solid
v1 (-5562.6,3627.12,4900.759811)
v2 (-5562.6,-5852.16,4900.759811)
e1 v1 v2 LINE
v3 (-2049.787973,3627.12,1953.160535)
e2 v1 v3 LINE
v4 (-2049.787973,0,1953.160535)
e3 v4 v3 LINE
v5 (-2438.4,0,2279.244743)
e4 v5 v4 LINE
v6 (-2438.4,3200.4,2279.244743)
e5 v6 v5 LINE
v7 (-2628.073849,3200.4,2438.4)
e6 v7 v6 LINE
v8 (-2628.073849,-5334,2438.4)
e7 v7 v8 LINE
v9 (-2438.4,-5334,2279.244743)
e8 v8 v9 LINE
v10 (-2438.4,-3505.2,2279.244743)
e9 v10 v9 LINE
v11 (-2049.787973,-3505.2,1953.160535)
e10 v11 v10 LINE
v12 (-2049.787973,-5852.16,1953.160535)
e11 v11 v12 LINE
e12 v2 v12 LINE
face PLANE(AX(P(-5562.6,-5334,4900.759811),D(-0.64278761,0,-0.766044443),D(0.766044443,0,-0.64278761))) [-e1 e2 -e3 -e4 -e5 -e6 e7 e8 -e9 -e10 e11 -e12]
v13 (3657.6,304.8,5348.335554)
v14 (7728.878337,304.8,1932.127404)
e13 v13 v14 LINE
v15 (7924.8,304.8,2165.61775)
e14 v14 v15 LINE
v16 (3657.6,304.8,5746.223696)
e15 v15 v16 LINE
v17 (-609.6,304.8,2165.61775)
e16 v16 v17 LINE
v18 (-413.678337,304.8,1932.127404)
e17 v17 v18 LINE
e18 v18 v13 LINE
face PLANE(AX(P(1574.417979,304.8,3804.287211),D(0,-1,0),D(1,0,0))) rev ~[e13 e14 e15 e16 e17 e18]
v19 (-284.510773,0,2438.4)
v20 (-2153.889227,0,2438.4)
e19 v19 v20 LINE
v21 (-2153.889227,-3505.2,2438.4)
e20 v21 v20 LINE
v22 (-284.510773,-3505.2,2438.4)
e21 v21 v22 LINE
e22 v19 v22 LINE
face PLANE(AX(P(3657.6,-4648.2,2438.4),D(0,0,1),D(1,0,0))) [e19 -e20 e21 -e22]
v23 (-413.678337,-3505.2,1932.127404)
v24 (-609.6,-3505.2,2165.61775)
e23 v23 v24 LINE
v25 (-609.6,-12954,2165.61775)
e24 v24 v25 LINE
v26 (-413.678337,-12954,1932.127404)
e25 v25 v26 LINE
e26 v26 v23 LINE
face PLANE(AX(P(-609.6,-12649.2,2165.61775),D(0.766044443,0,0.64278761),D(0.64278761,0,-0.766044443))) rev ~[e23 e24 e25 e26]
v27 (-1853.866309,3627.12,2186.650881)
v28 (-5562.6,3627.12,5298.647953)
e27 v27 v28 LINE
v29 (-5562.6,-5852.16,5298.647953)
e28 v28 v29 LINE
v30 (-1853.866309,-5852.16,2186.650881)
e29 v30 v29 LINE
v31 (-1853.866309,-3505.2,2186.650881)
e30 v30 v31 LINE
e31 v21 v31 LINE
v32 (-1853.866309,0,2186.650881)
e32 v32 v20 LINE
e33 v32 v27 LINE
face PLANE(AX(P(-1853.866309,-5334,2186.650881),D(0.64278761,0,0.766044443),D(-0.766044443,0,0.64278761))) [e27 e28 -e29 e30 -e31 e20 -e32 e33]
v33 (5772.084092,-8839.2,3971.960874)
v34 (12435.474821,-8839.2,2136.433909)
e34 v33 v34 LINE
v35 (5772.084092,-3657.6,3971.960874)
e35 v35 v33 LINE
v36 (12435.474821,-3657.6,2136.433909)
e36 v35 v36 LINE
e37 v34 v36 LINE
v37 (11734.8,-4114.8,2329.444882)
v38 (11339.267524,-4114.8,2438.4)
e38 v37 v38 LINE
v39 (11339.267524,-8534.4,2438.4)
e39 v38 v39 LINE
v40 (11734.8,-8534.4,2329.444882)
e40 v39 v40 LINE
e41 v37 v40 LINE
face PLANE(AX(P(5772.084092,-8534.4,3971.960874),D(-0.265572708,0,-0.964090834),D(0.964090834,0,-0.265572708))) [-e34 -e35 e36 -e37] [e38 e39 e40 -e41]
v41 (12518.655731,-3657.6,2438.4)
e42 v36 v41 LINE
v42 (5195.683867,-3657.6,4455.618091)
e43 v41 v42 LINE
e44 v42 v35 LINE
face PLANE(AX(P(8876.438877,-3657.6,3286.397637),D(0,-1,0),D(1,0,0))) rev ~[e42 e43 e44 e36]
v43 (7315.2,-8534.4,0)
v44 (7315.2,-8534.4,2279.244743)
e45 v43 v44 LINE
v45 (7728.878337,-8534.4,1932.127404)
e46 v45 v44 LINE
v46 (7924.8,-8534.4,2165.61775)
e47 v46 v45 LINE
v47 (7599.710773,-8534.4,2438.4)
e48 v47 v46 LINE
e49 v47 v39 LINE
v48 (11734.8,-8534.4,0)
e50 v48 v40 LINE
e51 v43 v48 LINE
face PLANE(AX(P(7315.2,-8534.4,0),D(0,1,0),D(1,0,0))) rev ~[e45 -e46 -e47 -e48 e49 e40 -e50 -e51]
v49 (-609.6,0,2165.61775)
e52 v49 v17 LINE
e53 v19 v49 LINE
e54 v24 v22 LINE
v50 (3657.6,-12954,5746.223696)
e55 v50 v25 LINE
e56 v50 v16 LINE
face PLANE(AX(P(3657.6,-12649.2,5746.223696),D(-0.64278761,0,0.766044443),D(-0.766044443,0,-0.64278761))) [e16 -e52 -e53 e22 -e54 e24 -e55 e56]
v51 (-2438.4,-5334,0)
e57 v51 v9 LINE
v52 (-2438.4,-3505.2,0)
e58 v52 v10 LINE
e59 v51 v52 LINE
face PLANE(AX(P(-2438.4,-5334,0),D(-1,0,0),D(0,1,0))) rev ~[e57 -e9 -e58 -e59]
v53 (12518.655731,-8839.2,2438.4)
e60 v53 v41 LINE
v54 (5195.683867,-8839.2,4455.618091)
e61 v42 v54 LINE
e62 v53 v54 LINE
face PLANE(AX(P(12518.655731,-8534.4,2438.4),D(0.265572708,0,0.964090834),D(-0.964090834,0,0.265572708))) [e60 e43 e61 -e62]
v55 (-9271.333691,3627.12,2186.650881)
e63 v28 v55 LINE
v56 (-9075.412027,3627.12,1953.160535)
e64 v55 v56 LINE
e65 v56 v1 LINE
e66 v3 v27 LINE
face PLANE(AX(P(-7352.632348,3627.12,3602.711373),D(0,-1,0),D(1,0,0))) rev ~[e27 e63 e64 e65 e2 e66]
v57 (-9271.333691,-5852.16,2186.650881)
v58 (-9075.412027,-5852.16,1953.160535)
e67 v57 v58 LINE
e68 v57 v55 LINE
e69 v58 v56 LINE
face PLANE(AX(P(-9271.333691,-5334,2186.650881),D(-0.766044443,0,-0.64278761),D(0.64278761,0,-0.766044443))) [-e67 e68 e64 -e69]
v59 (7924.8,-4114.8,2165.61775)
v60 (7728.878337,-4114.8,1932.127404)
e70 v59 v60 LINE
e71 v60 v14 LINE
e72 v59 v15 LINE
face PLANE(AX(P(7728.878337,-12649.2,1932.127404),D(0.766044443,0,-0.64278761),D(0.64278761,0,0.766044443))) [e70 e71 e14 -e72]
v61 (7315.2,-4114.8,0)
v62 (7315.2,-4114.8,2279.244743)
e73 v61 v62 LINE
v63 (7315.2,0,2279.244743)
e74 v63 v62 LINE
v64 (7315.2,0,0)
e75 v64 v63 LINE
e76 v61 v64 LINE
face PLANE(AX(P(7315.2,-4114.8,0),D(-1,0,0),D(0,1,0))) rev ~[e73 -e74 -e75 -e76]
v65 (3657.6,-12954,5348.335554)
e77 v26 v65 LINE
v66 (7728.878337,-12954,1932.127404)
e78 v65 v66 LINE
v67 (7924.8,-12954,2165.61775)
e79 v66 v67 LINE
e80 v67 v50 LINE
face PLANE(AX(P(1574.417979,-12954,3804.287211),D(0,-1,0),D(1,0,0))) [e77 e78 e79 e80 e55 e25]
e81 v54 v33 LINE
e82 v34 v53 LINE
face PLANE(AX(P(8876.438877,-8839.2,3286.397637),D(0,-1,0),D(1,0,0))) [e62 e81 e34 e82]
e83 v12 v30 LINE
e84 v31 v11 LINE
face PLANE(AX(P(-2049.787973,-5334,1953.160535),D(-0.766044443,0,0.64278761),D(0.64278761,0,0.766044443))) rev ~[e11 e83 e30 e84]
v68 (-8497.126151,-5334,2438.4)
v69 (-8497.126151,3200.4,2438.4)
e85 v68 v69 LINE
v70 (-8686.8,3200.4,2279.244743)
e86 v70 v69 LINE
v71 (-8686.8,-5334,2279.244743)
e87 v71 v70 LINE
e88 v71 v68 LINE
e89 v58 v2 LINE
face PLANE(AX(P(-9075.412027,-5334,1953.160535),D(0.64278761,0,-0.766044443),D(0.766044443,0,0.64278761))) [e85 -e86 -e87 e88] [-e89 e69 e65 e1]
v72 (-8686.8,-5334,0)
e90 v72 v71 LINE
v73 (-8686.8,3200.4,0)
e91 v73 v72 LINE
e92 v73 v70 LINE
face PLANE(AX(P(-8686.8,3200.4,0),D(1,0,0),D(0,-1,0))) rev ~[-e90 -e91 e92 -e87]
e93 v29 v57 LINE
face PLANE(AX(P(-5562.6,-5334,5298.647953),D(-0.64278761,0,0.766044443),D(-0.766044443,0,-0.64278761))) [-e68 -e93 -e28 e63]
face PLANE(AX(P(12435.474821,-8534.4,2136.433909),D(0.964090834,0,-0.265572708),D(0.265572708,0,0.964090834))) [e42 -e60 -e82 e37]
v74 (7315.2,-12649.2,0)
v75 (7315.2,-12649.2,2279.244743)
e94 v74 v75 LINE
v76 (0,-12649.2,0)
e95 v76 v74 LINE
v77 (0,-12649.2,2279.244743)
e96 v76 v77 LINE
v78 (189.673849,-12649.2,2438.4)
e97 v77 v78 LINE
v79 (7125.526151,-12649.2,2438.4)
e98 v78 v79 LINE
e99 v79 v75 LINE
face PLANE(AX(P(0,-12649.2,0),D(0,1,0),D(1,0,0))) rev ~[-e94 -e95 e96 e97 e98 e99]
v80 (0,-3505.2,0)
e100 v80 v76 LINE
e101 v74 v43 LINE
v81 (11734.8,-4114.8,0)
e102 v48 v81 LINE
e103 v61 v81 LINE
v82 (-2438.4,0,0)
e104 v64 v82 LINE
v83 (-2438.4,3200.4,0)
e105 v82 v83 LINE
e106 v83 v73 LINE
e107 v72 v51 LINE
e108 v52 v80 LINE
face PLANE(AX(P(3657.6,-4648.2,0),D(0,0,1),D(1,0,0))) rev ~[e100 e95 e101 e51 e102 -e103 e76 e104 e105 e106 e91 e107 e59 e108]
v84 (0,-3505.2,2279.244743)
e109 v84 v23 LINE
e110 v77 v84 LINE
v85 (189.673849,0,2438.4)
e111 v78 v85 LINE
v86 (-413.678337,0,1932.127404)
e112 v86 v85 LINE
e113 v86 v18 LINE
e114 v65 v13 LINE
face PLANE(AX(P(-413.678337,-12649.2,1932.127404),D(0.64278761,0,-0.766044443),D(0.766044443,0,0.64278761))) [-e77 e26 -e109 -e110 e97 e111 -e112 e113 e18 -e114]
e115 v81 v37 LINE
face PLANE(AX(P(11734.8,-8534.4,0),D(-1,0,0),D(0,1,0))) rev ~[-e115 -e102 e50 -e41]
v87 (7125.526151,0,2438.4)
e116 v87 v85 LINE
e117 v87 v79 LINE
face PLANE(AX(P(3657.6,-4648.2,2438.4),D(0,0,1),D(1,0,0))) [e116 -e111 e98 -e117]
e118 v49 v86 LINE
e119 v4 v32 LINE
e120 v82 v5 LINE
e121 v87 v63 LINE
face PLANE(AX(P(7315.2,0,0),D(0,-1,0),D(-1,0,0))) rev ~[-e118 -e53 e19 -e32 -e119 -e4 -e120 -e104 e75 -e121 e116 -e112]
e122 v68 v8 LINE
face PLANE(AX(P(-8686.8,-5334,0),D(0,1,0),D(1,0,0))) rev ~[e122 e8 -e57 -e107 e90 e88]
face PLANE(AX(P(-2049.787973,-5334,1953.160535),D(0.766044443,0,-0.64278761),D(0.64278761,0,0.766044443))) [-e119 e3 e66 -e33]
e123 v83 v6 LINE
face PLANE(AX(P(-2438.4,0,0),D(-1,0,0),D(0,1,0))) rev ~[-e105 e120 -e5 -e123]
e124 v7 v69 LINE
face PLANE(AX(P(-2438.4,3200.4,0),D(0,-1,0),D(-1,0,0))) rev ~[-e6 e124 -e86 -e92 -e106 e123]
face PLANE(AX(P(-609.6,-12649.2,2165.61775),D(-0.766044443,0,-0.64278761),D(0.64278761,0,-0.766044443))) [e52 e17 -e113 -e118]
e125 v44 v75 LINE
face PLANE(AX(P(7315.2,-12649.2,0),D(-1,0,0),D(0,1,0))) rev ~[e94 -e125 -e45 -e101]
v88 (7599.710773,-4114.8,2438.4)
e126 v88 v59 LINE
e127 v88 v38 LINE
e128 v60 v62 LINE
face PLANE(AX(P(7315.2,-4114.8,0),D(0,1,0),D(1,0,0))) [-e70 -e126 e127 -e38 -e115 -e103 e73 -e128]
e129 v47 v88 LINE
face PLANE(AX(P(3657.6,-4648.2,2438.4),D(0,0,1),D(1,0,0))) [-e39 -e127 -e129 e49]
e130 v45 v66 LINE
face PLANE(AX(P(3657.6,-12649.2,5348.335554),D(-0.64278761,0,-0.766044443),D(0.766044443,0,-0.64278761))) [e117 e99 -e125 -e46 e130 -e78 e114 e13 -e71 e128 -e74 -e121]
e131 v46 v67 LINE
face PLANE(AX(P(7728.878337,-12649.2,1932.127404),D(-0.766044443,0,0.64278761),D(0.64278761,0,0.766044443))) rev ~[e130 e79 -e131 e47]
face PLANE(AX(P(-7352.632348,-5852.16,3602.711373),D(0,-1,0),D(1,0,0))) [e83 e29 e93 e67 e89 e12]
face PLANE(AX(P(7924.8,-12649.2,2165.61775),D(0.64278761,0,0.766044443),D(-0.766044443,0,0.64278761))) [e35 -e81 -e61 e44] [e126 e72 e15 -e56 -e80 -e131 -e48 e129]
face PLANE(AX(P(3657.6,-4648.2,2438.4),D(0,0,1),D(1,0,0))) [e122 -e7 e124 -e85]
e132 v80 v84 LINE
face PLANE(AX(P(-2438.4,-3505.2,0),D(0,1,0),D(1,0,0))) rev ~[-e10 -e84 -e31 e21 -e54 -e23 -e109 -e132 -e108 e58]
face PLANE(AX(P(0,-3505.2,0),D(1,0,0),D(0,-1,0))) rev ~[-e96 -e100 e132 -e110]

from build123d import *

# Parameters (mm, degrees)
F0_W          = 7315.2
F0_H          = 3352.8
F0_W_2        = 2438.4
F0_H_2        = 3505.2
F0_W_3        = 4419.6
F0_H_3        = 4419.6
F1_DEPTH      = 2438.4
F3_DEPTH      = 304.8
F3_DEPTH_BACK = 12954
F5_DEPTH      = 304.8
F5_DEPTH_BACK = 4876.8
F7_DEPTH      = 518.16
F7_DEPTH_BACK = 8961.12


with BuildPart() as f1:
    # F0 (on Top) → F1 (new body)
    with BuildSketch(Plane.XY):
        Polygon((7315.2, 0), (0, 0), (0, -3505.2), (0, -9296.4), (7315.2, -9296.4), (7315.2, -8534.4), (7315.2, -4114.8), align=None)
        with Locations((3657.6, -10972.8)):
            Rectangle(F0_W, F0_H)
        with Locations((-1219.2, -1752.6)):
            Rectangle(F0_W_2, F0_H_2)
        with Locations((9525, -6324.6)):
            Rectangle(F0_W_3, F0_H_3)
        Polygon((-2438.4, -3505.2), (-2438.4, 0), (-2438.4, 3200.4), (-8686.8, 3200.4), (-8686.8, -5334), (-2438.4, -5334), align=None)
    extrude(amount=F1_DEPTH)

    # F2 (on face) → F3 (join, two sides)
    with BuildSketch(Plane.XZ.offset(12649.2)) as f3_sk:
        Polygon((189.6738489708, 2438.4), (3657.6, 5348.3355542786), (3657.6, 5746.2236960671), (-609.6, 2165.6177499074), (-413.6783365675, 1932.1274036448), (0, 2279.2447432846), (0, 2438.4), align=None)
        Polygon((3657.6, 5746.2236960671), (3657.6, 5348.3355542786), (7125.5261510292, 2438.4), (7315.2, 2438.4), (7315.2, 2279.2447432846), (7728.8783365675, 1932.1274036448), (7924.8, 2165.6177499074), align=None)
        Polygon((0, 2279.2447432846), (189.6738489708, 2438.4), (0, 2438.4), align=None)
        Polygon((7315.2, 2438.4), (7125.5261510292, 2438.4), (7315.2, 2279.2447432846), align=None)
    extrude(amount=F3_DEPTH)
    extrude(f3_sk.sketch, amount=-F3_DEPTH_BACK)

    # F4 (on face) → F5 (join, two sides)
    with BuildSketch(Plane.XZ.offset(8534.4)) as f5_sk:
        Polygon((5195.6838666947, 4455.6180908039), (5772.0840919647, 3971.9608743693), (12435.4748210193, 2136.4339087914), (12518.6557308055, 2438.4), align=None)
    extrude(amount=F5_DEPTH)
    extrude(f5_sk.sketch, amount=-F5_DEPTH_BACK)

    # F6 (on face) → F7 (join, two sides)
    with BuildSketch(Plane.XZ.offset(5334)) as f7_sk:
        Polygon((-9075.4120271523, 1953.16053463), (-5562.6, 4900.7598110087), (-5562.6, 5298.6479527971), (-9271.3336905848, 2186.6508808927), align=None)
        Polygon((-5562.6, 5298.6479527971), (-5562.6, 4900.7598110087), (-2049.7879728477, 1953.16053463), (-1853.8663094152, 2186.6508808927), align=None)
    extrude(amount=F7_DEPTH)
    extrude(f7_sk.sketch, amount=-F7_DEPTH_BACK)


solid = f1.part
